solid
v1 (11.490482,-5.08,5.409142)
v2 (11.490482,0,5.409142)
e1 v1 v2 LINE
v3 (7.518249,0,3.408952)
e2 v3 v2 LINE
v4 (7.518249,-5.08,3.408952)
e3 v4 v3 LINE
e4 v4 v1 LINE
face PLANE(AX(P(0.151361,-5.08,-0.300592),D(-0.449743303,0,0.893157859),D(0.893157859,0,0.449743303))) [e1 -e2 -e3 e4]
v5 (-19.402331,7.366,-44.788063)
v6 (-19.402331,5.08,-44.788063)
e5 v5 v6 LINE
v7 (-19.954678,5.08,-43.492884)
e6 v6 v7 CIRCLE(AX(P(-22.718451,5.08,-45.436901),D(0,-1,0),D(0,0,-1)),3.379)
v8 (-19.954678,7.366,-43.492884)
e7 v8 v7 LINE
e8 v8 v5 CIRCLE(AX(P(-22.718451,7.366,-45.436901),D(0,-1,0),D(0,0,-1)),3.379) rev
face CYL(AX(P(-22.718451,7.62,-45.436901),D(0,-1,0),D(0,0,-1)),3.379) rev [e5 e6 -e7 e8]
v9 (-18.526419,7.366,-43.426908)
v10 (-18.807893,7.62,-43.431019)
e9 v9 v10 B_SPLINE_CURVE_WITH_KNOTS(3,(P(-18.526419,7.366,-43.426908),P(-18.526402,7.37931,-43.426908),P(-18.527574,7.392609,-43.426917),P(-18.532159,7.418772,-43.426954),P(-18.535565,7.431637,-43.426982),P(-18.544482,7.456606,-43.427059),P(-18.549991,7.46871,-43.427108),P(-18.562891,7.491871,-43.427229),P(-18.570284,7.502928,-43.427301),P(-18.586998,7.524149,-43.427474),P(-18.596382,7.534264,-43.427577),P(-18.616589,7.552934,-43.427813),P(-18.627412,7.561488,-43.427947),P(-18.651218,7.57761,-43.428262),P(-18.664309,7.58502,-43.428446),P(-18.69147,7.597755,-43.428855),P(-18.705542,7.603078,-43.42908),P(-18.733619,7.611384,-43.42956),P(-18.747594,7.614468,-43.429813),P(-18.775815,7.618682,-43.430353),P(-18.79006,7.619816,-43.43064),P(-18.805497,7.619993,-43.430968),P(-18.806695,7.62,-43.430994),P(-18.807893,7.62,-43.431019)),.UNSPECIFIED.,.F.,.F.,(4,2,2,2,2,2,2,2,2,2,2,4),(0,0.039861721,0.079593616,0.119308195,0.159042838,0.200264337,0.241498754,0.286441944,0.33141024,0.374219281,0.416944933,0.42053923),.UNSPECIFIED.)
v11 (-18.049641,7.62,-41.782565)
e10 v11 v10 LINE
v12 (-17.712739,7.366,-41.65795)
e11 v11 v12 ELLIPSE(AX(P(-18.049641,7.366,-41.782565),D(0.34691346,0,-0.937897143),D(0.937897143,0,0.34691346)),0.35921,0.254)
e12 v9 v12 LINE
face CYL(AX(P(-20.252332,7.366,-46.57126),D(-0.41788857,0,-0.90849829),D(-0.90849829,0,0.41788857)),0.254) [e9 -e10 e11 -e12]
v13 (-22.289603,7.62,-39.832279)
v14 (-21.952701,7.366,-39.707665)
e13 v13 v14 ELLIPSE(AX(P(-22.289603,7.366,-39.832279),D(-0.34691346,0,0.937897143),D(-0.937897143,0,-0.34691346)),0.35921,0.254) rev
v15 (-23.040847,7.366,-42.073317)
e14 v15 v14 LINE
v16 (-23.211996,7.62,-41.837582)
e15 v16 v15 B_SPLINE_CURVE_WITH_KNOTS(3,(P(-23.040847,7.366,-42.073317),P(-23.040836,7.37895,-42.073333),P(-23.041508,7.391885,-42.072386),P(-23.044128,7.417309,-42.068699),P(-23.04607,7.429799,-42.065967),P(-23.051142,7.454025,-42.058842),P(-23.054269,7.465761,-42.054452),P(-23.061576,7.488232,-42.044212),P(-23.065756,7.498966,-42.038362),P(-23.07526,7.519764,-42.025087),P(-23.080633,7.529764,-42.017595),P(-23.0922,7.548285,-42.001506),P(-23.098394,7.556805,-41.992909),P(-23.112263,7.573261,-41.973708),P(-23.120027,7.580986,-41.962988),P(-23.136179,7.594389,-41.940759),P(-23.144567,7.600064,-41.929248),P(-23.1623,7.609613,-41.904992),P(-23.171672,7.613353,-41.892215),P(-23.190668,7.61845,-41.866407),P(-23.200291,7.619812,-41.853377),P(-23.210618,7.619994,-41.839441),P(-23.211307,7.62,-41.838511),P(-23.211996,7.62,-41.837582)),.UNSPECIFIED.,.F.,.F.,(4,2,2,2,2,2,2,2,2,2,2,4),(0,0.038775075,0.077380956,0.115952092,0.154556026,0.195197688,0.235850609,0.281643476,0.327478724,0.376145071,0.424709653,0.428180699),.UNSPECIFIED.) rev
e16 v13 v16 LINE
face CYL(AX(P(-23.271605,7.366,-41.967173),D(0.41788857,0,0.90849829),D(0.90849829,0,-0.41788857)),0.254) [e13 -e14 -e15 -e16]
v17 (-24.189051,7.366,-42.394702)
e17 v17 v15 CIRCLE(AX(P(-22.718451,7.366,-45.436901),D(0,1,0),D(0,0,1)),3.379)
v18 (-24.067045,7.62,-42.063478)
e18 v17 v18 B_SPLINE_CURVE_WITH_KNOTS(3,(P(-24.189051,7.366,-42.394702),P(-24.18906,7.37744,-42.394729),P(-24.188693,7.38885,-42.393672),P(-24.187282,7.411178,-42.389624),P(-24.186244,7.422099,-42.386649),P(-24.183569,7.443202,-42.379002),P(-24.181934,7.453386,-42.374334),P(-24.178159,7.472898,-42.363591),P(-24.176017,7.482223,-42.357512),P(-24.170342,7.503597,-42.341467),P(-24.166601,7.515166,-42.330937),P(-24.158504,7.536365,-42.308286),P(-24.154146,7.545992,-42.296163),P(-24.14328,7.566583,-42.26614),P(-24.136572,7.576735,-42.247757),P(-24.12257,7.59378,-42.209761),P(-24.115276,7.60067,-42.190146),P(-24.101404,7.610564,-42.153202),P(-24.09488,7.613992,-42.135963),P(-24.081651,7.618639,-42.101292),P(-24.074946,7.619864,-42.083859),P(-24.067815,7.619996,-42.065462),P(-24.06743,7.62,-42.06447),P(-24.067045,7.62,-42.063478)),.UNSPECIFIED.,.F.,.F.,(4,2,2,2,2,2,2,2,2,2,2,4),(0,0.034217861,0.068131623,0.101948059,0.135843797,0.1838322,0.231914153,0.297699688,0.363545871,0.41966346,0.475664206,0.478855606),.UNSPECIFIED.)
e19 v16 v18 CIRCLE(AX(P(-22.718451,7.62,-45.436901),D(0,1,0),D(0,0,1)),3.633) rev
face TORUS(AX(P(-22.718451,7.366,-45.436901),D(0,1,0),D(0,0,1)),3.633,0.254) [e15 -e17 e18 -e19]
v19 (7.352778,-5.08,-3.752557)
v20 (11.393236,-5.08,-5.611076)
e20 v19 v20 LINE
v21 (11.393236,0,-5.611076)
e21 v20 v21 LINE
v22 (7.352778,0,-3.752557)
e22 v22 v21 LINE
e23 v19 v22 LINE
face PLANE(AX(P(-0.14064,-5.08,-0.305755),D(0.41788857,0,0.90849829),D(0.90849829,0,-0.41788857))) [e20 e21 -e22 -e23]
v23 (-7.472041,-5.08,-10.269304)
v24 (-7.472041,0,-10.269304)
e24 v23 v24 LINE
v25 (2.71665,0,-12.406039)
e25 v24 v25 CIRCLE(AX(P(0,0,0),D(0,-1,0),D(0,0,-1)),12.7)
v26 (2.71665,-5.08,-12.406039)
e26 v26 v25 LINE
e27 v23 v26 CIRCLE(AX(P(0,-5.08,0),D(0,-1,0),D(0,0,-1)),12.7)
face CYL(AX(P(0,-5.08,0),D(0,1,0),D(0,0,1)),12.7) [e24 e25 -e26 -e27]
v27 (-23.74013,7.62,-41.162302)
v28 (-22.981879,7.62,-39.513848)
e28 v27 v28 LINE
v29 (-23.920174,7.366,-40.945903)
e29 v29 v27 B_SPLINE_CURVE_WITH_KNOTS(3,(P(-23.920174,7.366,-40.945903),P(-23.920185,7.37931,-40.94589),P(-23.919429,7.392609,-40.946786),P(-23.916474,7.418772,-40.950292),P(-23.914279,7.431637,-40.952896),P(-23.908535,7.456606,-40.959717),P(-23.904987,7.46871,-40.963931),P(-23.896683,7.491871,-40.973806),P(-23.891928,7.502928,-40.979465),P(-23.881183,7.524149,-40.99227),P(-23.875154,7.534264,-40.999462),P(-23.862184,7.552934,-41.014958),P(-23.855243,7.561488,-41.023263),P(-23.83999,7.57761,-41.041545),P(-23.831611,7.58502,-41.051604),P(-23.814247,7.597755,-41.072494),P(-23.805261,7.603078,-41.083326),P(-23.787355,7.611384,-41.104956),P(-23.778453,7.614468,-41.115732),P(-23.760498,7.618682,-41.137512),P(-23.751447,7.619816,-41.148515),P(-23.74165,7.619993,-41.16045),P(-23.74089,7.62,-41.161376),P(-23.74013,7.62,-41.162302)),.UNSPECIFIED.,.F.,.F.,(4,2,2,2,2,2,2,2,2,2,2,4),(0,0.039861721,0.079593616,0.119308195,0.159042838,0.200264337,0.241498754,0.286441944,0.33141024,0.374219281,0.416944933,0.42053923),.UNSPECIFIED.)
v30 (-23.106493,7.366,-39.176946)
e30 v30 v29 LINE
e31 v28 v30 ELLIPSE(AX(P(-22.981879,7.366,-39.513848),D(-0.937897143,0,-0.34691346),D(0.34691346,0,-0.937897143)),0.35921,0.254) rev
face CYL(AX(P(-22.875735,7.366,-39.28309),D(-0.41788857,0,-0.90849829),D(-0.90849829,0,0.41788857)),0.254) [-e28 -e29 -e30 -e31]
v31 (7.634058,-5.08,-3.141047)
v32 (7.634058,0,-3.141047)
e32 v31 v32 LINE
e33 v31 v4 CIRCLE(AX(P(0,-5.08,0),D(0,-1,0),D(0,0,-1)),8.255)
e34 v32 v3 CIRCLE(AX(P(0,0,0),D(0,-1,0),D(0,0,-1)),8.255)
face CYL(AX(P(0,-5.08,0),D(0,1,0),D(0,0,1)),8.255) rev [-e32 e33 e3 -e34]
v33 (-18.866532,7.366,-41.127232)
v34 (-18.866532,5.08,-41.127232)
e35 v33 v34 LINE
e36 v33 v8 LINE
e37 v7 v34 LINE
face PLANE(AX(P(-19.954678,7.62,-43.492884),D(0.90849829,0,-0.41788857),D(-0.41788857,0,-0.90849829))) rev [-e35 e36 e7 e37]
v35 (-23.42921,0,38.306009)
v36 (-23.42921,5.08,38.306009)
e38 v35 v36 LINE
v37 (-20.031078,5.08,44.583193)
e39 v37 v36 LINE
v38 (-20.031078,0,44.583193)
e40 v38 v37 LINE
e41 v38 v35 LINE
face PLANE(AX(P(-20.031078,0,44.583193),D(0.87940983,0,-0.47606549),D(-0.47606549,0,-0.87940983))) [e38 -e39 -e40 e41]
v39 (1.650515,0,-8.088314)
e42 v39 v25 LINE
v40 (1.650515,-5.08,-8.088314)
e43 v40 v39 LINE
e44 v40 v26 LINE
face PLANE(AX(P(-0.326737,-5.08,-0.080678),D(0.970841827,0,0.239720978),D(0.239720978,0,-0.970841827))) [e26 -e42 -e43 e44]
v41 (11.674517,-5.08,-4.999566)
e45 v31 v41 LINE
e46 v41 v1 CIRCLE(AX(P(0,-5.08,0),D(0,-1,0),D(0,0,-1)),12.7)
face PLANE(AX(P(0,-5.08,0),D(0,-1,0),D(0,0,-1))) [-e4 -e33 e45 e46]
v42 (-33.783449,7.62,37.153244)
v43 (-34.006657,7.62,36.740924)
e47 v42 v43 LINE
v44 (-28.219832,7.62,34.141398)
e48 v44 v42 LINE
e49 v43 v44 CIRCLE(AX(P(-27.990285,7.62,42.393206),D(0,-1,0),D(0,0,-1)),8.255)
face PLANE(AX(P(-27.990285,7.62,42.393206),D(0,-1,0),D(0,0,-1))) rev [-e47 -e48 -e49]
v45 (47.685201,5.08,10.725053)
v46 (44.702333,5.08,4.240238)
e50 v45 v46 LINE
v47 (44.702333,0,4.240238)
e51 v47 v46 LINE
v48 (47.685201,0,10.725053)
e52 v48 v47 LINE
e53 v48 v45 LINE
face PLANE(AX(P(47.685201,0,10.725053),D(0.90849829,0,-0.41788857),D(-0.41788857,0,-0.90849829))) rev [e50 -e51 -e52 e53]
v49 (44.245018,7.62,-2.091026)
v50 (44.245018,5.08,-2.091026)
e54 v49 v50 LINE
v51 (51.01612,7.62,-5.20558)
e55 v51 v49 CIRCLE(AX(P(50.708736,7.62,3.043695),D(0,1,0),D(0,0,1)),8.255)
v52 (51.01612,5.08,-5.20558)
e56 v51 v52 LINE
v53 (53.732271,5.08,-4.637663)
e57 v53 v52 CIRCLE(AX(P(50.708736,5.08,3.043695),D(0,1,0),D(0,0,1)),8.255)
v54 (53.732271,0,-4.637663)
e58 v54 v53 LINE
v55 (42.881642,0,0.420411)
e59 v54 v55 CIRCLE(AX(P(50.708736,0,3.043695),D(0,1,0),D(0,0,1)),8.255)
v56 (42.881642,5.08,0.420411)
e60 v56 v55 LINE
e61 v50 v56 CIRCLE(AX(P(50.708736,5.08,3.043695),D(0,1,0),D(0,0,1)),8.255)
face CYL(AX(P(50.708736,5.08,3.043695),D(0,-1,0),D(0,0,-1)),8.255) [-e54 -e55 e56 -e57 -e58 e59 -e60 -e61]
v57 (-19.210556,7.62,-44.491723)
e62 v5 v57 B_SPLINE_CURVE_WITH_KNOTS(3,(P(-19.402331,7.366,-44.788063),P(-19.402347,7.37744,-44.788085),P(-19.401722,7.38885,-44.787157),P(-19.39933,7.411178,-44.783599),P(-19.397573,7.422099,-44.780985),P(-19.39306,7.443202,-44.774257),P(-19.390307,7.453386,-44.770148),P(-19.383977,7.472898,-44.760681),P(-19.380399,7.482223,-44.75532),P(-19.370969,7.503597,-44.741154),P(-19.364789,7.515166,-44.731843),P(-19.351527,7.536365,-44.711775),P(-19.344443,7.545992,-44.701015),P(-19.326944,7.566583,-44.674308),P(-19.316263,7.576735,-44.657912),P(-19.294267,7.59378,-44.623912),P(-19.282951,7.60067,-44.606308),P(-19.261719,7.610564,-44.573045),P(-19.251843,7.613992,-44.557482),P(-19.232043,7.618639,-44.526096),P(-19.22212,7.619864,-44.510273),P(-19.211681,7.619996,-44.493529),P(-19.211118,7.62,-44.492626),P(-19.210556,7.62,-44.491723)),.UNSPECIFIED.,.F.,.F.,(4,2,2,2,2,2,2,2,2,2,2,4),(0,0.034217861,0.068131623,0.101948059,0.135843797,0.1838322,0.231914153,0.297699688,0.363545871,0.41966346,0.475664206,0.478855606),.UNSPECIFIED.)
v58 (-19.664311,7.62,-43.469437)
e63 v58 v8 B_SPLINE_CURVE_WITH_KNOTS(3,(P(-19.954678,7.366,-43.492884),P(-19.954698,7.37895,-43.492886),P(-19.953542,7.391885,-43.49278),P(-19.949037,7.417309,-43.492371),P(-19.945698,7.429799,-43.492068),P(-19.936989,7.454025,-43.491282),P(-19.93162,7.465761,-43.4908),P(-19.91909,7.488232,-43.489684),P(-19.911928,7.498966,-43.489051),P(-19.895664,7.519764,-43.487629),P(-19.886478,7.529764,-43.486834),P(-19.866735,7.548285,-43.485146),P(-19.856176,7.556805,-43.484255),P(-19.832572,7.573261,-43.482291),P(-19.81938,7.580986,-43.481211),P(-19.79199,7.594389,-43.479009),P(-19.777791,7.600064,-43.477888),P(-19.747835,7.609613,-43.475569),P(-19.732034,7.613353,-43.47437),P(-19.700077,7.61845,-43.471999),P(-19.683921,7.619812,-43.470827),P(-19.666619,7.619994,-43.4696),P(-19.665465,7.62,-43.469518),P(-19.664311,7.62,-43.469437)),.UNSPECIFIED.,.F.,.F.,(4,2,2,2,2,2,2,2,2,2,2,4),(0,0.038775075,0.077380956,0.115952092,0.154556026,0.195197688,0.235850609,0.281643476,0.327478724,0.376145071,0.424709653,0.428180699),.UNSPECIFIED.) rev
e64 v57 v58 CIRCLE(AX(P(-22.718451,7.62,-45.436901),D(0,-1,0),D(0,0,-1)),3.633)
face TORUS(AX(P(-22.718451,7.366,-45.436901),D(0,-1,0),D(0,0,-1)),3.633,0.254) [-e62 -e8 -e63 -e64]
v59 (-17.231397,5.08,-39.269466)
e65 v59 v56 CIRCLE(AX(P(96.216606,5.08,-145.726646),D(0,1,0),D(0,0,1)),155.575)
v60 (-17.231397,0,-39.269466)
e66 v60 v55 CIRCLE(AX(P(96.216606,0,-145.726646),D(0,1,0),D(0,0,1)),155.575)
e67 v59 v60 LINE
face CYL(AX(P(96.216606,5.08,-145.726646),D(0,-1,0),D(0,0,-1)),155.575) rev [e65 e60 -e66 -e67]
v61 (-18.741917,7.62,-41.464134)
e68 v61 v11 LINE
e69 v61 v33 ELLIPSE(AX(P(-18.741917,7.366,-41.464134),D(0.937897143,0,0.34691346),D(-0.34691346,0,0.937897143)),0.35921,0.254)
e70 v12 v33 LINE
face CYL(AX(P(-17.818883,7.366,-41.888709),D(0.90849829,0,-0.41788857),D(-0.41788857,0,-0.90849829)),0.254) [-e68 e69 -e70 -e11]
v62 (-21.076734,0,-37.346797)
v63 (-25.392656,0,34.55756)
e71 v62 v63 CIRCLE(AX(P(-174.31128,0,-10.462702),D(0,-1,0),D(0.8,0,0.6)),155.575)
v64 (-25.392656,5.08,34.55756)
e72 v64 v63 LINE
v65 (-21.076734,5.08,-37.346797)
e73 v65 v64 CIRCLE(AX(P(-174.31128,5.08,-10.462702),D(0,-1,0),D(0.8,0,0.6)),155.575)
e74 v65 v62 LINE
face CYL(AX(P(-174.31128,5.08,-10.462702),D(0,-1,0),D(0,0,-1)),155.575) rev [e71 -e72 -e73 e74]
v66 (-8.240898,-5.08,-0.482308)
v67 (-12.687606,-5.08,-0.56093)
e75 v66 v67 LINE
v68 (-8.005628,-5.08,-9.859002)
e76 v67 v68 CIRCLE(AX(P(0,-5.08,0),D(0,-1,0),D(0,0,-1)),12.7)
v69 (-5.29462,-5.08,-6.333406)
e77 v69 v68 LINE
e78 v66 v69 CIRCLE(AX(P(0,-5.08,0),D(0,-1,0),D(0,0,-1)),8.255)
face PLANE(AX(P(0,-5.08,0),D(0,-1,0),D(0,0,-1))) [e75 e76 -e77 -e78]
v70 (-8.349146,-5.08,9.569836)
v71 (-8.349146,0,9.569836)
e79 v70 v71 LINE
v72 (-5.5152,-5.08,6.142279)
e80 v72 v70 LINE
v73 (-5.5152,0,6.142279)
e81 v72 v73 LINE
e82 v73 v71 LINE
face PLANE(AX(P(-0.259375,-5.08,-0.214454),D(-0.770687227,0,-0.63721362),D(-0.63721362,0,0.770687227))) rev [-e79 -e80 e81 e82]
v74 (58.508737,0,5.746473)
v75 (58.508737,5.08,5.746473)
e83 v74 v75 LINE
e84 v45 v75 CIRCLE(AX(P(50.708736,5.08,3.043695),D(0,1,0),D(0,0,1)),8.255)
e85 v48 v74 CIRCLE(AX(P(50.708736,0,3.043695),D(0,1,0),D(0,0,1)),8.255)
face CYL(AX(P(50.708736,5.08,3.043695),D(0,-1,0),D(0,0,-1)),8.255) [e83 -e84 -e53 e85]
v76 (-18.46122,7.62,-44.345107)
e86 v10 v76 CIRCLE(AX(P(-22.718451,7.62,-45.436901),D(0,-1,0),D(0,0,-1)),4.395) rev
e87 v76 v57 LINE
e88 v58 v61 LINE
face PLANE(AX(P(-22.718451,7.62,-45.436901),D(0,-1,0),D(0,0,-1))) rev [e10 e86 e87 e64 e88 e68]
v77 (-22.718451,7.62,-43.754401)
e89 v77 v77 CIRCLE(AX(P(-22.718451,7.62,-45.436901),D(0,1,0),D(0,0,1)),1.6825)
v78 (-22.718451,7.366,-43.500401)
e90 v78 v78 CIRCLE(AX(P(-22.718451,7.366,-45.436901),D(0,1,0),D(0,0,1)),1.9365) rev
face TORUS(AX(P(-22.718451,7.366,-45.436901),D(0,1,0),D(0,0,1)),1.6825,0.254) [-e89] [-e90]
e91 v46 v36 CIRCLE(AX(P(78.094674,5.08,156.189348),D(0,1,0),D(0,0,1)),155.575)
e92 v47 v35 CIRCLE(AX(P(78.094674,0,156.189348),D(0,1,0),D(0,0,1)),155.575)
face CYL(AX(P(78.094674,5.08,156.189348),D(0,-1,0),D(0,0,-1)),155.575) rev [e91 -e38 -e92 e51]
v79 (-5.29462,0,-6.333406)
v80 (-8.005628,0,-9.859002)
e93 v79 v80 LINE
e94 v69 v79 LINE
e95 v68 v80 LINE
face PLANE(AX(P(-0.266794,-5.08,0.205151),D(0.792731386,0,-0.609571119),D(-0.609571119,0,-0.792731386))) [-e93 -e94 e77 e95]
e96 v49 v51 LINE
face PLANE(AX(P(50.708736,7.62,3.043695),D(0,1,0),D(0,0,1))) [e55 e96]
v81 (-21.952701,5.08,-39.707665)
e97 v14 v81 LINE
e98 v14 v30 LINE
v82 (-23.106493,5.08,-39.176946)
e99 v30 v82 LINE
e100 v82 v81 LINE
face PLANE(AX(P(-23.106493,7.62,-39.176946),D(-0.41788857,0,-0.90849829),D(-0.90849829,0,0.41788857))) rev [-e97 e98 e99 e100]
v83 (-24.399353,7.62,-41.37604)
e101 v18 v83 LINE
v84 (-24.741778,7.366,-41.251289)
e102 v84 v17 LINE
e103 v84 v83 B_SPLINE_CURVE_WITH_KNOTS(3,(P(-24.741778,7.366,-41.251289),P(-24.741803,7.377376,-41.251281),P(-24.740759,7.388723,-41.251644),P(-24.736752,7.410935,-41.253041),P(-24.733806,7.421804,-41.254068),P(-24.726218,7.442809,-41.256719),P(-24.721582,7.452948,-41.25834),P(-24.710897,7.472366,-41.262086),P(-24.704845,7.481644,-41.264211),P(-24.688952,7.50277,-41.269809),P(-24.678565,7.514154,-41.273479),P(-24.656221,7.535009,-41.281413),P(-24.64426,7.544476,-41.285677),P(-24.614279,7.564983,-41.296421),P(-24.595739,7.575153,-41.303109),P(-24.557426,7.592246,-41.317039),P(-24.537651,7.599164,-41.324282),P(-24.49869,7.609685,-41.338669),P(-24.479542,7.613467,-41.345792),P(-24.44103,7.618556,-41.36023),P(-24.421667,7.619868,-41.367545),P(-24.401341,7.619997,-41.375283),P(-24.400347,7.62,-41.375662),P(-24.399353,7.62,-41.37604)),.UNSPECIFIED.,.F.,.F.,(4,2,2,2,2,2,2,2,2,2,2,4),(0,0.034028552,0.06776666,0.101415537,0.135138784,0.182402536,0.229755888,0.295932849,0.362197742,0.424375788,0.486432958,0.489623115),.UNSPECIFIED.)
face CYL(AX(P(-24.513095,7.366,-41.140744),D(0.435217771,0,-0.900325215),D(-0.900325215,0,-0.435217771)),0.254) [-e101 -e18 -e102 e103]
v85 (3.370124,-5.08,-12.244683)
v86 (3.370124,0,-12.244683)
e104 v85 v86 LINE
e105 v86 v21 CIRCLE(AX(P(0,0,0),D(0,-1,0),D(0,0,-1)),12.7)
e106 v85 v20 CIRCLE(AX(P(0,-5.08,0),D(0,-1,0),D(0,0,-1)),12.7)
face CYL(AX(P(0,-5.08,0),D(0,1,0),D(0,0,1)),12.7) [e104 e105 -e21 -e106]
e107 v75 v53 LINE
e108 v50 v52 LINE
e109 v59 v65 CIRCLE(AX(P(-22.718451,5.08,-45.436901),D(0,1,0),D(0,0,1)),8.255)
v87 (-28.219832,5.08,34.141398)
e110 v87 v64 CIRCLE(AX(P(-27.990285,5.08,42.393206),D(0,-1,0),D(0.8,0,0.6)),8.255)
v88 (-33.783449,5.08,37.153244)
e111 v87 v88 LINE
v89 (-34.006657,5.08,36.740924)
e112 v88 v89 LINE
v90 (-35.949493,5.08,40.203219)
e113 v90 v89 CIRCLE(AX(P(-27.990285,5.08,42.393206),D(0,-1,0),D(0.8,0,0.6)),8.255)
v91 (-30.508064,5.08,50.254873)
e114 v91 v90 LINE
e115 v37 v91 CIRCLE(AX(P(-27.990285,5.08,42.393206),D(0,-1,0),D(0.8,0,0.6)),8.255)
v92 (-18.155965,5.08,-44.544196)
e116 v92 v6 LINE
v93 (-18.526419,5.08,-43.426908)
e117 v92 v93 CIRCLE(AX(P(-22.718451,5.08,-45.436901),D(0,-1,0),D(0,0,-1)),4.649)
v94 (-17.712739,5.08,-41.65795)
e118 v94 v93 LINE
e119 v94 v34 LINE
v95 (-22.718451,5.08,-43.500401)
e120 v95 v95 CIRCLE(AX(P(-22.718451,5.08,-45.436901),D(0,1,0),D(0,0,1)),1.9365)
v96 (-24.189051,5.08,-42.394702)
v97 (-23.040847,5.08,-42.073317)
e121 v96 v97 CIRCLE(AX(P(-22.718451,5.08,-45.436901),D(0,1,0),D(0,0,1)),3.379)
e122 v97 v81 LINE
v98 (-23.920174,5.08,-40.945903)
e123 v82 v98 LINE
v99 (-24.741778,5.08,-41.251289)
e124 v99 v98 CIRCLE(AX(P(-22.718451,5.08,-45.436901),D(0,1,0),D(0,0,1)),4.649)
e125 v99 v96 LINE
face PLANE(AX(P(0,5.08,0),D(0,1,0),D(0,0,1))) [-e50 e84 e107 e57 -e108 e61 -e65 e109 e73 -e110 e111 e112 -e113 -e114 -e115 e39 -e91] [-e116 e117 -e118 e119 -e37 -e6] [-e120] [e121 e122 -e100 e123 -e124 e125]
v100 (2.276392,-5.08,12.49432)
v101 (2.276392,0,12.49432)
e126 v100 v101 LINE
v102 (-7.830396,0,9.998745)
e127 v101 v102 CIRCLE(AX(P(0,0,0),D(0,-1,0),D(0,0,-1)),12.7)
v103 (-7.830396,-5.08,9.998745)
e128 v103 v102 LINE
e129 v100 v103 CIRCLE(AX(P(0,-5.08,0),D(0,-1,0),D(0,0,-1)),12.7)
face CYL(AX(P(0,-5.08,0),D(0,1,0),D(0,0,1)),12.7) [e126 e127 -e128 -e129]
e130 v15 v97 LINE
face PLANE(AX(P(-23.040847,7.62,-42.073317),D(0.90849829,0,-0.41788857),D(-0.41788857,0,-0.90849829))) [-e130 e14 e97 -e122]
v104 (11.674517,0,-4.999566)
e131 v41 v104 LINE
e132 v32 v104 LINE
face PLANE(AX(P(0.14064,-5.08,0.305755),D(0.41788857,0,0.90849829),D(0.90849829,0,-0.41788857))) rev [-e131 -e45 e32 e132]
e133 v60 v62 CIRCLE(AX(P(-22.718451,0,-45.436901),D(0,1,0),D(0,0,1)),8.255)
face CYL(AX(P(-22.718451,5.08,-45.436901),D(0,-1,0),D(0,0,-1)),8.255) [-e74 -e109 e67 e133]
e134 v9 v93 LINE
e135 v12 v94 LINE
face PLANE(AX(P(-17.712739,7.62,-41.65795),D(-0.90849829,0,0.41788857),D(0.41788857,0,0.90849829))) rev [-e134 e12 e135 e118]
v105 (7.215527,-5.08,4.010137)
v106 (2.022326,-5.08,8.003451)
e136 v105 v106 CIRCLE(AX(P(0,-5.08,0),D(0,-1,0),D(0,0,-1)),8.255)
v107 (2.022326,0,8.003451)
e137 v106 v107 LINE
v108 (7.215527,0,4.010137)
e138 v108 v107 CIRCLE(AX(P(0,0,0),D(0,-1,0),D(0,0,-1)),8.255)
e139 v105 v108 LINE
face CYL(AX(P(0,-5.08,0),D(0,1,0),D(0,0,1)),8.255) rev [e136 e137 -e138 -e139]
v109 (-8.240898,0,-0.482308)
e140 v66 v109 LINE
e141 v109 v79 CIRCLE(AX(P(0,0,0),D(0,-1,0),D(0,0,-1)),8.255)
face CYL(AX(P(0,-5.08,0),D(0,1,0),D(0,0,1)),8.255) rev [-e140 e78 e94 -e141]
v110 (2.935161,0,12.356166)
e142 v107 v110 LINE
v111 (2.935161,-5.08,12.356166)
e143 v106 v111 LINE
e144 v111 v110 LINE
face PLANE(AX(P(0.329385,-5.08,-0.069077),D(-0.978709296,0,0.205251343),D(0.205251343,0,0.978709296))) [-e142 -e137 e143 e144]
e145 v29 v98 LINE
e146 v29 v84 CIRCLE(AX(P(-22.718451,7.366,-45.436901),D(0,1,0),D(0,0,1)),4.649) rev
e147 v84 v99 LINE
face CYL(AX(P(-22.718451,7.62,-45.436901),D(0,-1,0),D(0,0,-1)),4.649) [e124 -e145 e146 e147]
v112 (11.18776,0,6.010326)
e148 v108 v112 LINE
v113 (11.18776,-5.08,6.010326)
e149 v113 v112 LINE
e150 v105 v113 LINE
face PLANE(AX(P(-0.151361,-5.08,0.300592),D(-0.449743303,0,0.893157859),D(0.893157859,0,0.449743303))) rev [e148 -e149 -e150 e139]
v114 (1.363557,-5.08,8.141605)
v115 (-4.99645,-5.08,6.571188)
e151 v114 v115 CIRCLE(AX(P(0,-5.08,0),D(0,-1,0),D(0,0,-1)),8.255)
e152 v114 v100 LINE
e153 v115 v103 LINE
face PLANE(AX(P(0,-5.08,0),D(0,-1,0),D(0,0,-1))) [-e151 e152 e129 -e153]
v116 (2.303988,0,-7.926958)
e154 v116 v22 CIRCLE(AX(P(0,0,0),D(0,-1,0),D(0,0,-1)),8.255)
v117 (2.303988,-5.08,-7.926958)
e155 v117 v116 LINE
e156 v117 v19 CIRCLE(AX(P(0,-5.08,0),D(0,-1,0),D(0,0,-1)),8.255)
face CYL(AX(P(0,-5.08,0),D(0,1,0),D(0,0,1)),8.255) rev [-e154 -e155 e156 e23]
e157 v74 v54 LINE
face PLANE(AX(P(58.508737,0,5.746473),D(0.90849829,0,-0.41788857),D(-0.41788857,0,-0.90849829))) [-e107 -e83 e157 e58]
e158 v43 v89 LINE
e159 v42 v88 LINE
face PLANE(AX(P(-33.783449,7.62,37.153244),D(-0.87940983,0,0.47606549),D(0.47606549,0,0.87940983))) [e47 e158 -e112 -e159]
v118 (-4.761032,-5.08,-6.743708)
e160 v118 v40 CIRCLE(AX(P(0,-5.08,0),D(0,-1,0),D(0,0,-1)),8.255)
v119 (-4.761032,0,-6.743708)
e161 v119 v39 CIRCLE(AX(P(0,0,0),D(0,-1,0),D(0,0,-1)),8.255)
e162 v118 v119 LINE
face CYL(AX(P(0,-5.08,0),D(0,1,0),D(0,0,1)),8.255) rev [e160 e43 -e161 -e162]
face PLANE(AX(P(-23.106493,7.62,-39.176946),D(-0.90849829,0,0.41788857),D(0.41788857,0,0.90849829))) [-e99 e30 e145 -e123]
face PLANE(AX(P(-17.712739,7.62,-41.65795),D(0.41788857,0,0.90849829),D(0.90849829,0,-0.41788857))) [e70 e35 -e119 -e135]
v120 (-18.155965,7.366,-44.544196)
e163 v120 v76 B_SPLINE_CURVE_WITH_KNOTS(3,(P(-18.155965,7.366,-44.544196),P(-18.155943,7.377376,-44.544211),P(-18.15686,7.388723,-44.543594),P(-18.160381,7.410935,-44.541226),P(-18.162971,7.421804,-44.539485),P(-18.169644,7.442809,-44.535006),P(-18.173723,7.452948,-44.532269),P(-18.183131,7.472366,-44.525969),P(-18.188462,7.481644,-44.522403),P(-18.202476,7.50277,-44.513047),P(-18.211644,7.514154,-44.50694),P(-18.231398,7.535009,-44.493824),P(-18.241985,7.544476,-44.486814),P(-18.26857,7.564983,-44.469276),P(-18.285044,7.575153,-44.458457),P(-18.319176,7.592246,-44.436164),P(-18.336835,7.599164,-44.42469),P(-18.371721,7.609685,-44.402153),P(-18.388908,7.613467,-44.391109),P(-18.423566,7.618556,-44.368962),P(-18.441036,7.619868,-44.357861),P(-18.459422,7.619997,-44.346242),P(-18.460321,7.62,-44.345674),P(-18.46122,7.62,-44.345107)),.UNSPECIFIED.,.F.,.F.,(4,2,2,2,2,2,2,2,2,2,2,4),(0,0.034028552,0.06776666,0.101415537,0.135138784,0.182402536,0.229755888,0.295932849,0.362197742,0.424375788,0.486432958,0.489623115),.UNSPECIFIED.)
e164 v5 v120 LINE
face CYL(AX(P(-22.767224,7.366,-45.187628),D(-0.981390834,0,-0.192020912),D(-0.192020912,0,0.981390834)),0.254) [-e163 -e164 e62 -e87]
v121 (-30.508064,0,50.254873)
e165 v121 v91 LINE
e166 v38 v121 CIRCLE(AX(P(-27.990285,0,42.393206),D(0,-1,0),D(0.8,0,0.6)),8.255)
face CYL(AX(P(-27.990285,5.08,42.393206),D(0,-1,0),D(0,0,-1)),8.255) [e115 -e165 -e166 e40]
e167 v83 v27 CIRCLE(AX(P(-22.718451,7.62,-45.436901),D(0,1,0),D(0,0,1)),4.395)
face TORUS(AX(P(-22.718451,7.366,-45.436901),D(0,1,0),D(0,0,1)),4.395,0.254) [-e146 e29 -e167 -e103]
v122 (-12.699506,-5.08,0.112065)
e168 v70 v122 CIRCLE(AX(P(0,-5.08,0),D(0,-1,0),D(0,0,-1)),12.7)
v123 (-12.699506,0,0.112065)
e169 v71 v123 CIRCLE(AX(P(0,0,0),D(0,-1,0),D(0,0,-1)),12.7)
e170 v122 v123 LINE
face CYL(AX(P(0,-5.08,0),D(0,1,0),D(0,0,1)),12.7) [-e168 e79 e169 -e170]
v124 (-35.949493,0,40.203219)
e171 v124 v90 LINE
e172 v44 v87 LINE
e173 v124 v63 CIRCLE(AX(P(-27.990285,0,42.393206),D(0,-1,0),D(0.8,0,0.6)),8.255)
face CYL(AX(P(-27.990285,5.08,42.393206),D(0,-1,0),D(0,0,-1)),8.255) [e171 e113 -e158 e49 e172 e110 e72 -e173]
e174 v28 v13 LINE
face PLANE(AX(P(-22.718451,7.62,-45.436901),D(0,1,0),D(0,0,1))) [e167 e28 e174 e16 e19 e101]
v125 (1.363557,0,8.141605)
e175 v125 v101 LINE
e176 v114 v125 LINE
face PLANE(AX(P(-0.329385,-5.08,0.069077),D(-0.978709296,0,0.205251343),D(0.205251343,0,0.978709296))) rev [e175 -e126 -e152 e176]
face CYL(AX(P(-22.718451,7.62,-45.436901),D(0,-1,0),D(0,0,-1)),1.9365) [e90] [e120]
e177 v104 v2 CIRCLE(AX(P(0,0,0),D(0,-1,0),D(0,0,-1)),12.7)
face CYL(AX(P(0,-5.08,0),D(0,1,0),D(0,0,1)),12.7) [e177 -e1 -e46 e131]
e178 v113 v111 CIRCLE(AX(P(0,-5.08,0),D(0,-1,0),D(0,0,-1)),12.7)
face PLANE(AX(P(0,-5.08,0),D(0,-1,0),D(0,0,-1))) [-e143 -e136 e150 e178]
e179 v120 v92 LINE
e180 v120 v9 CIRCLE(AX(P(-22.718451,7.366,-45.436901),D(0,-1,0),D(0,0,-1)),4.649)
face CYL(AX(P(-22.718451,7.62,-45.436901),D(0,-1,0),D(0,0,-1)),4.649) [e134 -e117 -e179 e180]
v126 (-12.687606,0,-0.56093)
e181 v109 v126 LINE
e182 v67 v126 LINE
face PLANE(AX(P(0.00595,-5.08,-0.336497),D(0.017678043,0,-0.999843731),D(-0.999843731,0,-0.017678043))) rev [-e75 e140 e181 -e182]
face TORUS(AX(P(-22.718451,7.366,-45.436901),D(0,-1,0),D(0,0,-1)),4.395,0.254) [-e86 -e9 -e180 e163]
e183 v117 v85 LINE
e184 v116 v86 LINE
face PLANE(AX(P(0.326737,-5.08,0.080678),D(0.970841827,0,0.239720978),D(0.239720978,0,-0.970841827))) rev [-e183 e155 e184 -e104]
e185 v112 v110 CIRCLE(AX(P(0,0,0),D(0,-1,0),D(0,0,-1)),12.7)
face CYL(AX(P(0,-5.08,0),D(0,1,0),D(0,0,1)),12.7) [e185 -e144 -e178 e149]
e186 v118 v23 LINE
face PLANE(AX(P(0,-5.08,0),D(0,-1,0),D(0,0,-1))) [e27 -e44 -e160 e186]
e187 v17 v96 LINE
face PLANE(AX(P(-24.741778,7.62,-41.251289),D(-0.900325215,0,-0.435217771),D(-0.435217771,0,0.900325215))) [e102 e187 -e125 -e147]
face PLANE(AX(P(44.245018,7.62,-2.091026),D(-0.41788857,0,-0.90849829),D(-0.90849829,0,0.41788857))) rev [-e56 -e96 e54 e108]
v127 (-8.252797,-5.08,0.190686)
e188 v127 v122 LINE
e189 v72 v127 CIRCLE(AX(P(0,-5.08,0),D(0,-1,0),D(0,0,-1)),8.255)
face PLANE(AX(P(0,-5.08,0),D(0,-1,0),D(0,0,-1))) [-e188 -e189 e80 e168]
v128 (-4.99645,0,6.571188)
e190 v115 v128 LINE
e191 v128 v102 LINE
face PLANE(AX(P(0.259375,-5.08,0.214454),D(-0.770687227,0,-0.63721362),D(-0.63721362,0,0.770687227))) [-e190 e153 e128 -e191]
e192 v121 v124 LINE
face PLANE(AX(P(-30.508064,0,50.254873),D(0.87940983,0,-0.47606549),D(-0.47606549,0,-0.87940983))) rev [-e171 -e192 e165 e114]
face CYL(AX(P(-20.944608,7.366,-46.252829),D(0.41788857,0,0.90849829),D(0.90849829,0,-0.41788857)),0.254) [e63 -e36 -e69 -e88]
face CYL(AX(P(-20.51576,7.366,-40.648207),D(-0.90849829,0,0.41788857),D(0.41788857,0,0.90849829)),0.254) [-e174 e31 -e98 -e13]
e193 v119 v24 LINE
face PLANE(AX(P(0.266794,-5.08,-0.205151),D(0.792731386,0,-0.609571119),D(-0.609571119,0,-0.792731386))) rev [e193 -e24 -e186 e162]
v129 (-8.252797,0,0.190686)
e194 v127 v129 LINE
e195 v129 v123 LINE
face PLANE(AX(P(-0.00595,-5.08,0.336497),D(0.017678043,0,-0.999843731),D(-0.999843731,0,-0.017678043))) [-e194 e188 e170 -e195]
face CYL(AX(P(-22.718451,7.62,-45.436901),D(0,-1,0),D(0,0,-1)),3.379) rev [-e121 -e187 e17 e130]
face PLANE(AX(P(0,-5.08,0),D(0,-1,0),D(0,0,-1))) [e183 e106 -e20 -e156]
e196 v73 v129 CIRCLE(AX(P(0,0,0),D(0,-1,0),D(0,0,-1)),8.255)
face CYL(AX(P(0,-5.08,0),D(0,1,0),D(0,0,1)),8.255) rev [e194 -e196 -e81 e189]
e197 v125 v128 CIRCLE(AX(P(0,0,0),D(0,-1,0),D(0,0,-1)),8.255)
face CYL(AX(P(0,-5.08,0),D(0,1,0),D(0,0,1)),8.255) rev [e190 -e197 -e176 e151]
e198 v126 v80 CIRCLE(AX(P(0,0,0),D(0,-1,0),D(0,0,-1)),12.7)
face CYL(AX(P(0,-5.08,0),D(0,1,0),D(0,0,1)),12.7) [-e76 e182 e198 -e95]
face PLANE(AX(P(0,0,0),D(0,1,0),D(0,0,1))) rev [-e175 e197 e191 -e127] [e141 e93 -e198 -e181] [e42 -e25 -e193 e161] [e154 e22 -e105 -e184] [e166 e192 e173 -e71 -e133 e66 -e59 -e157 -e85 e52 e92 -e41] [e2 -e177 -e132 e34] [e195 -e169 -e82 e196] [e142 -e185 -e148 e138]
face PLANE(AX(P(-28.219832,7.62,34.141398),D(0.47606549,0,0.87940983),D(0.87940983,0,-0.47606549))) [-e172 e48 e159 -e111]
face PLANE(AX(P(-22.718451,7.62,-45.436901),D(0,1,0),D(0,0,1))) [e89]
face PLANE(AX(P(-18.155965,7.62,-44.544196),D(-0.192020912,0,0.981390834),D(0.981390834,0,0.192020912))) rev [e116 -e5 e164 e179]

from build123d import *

# Parameters (mm, degrees)
SKETCH2_R           = 8.255
BOSS_EXTRUDE1_DEPTH = 5.08
CUT_EXTRUDE1_DEPTH  = 80.908377803
BOSS_EXTRUDE2_DEPTH = 5.08
SKETCH8_R           = 1.9365
BOSS_EXTRUDE4_DEPTH = 2.54
FILLET1_R           = 0.254


with BuildPart() as part:
    # Sketch2 → Boss-Extrude1 (new body)
    with BuildSketch(Plane(origin=(0, 0, 0), x_dir=(1, 0, 0), z_dir=(0, 1, 0))):
        with Locations((50.708736123, -3.043695253)):
            Circle(SKETCH2_R)
        with BuildLine():
            Line((-26.410198882, 52.820397765), (8.519418994, -17.038837989))
            ThreePointArc((8.519418994, -17.038837989), (29.111674539, -8.526738277), (50.708736123, -3.043695253))
            ThreePointArc((50.708736123, -3.043695253), (13.970978455, 13.668941274), (-17.231396722, 39.269465517))
            ThreePointArc((-17.231396722, 39.269465517), (-15.883780079, 50.066404858), (-26.410198882, 52.820397765))
        make_face()
    boss_extrude1 = extrude(amount=BOSS_EXTRUDE1_DEPTH)

    # Sketch5 → Cut-Extrude1 (cut, through all)
    with BuildSketch(Plane(origin=(0, 5.08, 0), x_dir=(1, 0, 0), z_dir=(0, 1, 0))):
        with BuildLine():
            Line((58.508737367, -5.746472638), (53.73227101, 4.637662817))
            ThreePointArc((53.73227101, 4.637662817), (58.208389507, 0.405974894), (58.508737367, -5.746472638))
        make_face()
        with BuildLine():
            Line((47.685201237, -10.725053322), (44.702333378, -4.240237651))
            ThreePointArc((44.702333378, -4.240237651), (43.662385588, -4.472512868), (42.624053092, -4.711905455))
            ThreePointArc((42.624053092, -4.711905455), (44.393072013, -8.359465362), (47.685201237, -10.725053322))
        make_face()
    cut_extrude1 = extrude(amount=-CUT_EXTRUDE1_DEPTH, mode=Mode.SUBTRACT)

    # Mirror4: Boss-Extrude1, Cut-Extrude1 across plane
    add(boss_extrude1.mirror(Plane(origin=(0, 5.08, 0), x_dir=(0.4472135954999568, 0, 0.8944271909999164), z_dir=(0.8944271909999165, 0, -0.4472135954999568))))
    add(cut_extrude1.mirror(Plane(origin=(0, 5.08, 0), x_dir=(0.4472135954999568, 0, 0.8944271909999164), z_dir=(0.8944271909999165, 0, -0.4472135954999568))), mode=Mode.SUBTRACT)

    # Sketch3 → Boss-Extrude2 (add)
    with BuildSketch(Plane.XZ):
        with BuildLine():
            Line((-7.830396175, 9.998744708), (-4.996450265, 6.571187849))
            ThreePointArc((-4.996450265, 6.571187849), (-1.978896677, 8.01429928), (1.363556525, 8.141605407))
            Line((1.363556525, 8.141605407), (2.276392011, 12.494320286))
            ThreePointArc((2.276392011, 12.494320286), (-3.044456426, 12.329691199), (-7.830396175, 9.998744708))
        make_face()
        with BuildLine():
            Line((2.935161238, 12.356165607), (2.022325752, 8.003450728))
            ThreePointArc((2.022325752, 8.003450728), (2.873803437, 7.738622539), (3.691748231, 7.383496462))
            Line((3.691748231, 7.383496462), (5.679612663, 11.359225326))
            ThreePointArc((5.679612663, 11.359225326), (4.336133626, 11.936831455), (2.935161238, 12.356165607))
        make_face()
        with BuildLine():
            ThreePointArc((3.691748231, 7.383496462), (5.70850704, 5.963050593), (7.215527013, 4.010136523))
            Line((7.215527013, 4.010136523), (11.187760156, 6.010326339))
            ThreePointArc((11.187760156, 6.010326339), (8.847584221, 9.110996293), (5.679612663, 11.359225326))
            Line((5.679612663, 11.359225326), (3.691748231, 7.383496462))
        make_face()
        with BuildLine():
            ThreePointArc((8.255, 0), (8.09827691, -1.600917263), (7.63405849, -3.141046955))
            Line((7.63405849, -3.141046955), (11.674516714, -4.99956593))
            ThreePointArc((11.674516714, -4.99956593), (12.440987949, -2.551826574), (12.7, 0))
            ThreePointArc((12.7, 0), (12.39393251, 2.771360123), (11.490482373, 5.409141784))
            Line((11.490482373, 5.409141784), (7.51824923, 3.408951968))
            ThreePointArc((7.51824923, 3.408951968), (8.068710318, 1.743828777), (8.255, 0))
        make_face()
        with BuildLine():
            Line((11.393235918, -5.611076129), (7.352777693, -3.752557154))
            ThreePointArc((7.352777693, -3.752557154), (5.260198437, -6.362023059), (2.303988218, -7.92695801))
            Line((2.303988218, -7.92695801), (3.370124071, -12.244683081))
            ThreePointArc((3.370124071, -12.244683081), (8.092612979, -9.787727784), (11.393235918, -5.611076129))
        make_face()
        with BuildLine():
            Line((2.716650437, -12.406039271), (1.650514584, -8.088314201))
            ThreePointArc((1.650514584, -8.088314201), (-1.07974567, -8.18408054), (-3.691748231, -7.383496462))
            Line((-3.691748231, -7.383496462), (-5.679612663, -11.359225326))
            ThreePointArc((-5.679612663, -11.359225326), (-1.571222819, -12.602430672), (2.716650437, -12.406039271))
        make_face()
        with BuildLine():
            Line((-5.679612663, -11.359225326), (-3.691748231, -7.383496462))
            ThreePointArc((-3.691748231, -7.383496462), (-4.238479263, -7.083806783), (-4.761032175, -6.743708003))
            Line((-4.761032175, -6.743708003), (-7.472040736, -10.269304126))
            ThreePointArc((-7.472040736, -10.269304126), (-6.598369408, -10.851337298), (-5.679612663, -11.359225326))
        make_face()
        with BuildLine():
            Line((-8.005628232, -9.859001806), (-5.294619671, -6.333405683))
            ThreePointArc((-5.294619671, -6.333405683), (-7.373018127, -3.712630966), (-8.240898233, -0.482308323))
            Line((-8.240898233, -0.482308323), (-12.687606467, -0.560929709))
            ThreePointArc((-12.687606467, -0.560929709), (-11.343104811, -5.711739948), (-8.005628232, -9.859001806))
        make_face()
        with BuildLine():
            Line((-12.699505558, 0.112065107), (-8.252797323, 0.190686492))
            ThreePointArc((-8.252797323, 0.190686492), (-7.499653384, 3.449670147), (-5.515199838, 6.142279361))
            Line((-5.515199838, 6.142279361), (-8.349145748, 9.56983622))
            ThreePointArc((-8.349145748, 9.56983622), (-11.537928283, 5.307184842), (-12.699505558, 0.112065107))
        make_face()
    extrude(amount=BOSS_EXTRUDE2_DEPTH)

    # Sketch8 → Boss-Extrude4 (add)
    with BuildSketch(Plane(origin=(0, 5.08, 0), x_dir=(1, 0, 0), z_dir=(0, 1, 0))):
        with Locations(Location((-22.718450651, 45.436901303, 0), (0, 0, 270))):
            Circle(SKETCH8_R)
        with BuildLine():
            Line((44.245017522, 2.091026438), (51.016120308, 5.205579865))
            ThreePointArc((51.016120308, 5.205579865), (47.259065976, 4.455958131), (44.245017522, 2.091026438))
        make_face()
        with BuildLine():
            Line((-28.219831663, -34.141398155), (-33.783449428, -37.153243515))
            Line((-33.783449428, -37.153243515), (-34.006657305, -36.740923771))
            ThreePointArc((-34.006657305, -36.740923771), (-31.372925912, -34.863081971), (-28.219831663, -34.141398155))
        make_face()
        with BuildLine():
            Line((-23.106493475, 39.17694603), (-23.920173634, 40.945903321))
            ThreePointArc((-23.920173634, 40.945903321), (-24.338189112, 41.07918994), (-24.741778068, 41.25128938))
            Line((-24.741778068, 41.25128938), (-24.189051499, 42.394702403))
            ThreePointArc((-24.189051499, 42.394702403), (-23.62923703, 42.182963815), (-23.040846879, 42.073316657))
            Line((-23.040846879, 42.073316657), (-21.952700646, 39.707664514))
            Line((-21.952700646, 39.707664514), (-23.106493475, 39.17694603))
        make_face()
        with BuildLine():
            Line((-18.155964663, 44.544196083), (-19.402331023, 44.788062641))
            ThreePointArc((-19.402331023, 44.788062641), (-19.610293029, 44.111383595), (-19.954678188, 43.49288413))
            Line((-19.954678188, 43.49288413), (-18.866531955, 41.127231987))
            Line((-18.866531955, 41.127231987), (-17.712739127, 41.657950471))
            Line((-17.712739127, 41.657950471), (-18.526419286, 43.426907762))
            ThreePointArc((-18.526419286, 43.426907762), (-18.305687705, 43.97377992), (-18.155964663, 44.544196083))
        make_face()
    extrude(amount=BOSS_EXTRUDE4_DEPTH)

    # Fillet1
    # the kernel refuses this fillet: 0.254 mm, written as the material it takes off along each edge
    with BuildSketch(Plane(origin=(-22.718450651, 7.62, -45.436901303), x_dir=(0, 0, 1), z_dir=(-1, 0, 0))) as fillet1_piece_1:
        with BuildLine():
            CenterArc((1.9365 - FILLET1_R, -FILLET1_R), FILLET1_R, 0, 90)
            Line((1.9365 - FILLET1_R, 0), (1.9365, 0))
            Line((1.9365, 0), (1.9365, -FILLET1_R))
        make_face()
    revolve(axis=Axis((-22.718450651, 7.62, -45.436901303), (0, 1, 0)), mode=Mode.SUBTRACT)
    with BuildSketch(Plane(origin=(-22.718450651, 7.62, -45.436901303), x_dir=(0.8344364668114368, 0, 0.5511041488278291), z_dir=(-0.5511041488278291, 0, 0.8344364668114368))) as fillet1_piece_2_section:
        with BuildLine():
            CenterArc((4.649 - FILLET1_R, -FILLET1_R), FILLET1_R, 0, 90)
            Line((4.649 - FILLET1_R, 0), (4.649, 0))
            Line((4.649, 0), (4.649, -FILLET1_R))
        make_face()
    fillet1_piece_2 = revolve(axis=Axis((-22.718450651, 7.62, -45.436901303), (0, 1, 0)), revolution_arc=30.198076812, mode=Mode.PRIVATE)
    fillet1_piece_2 = split(fillet1_piece_2, bisect_by=Plane(origin=(-18.824875628, 7.561246822, -44.075757948), z_dir=(0.9084982899729419, 0, -0.4178885702148846)), keep=Keep.TOP, mode=Mode.PRIVATE)
    add(fillet1_piece_2, mode=Mode.SUBTRACT)
    with BuildSketch(Plane(origin=(-19.44342837, 7.62, -40.861872745), x_dir=(0, -1, 0), z_dir=(0.9084982899729457, 0, -0.4178885702148762)), Plane(origin=(-17.532781484, 7.62, -44.422262804), x_dir=(0, -1, 0), z_dir=(-0.9813908341478762, 0, -0.19202091201360277))) as fillet1_piece_3:
        with BuildLine():
            CenterArc((FILLET1_R, FILLET1_R), FILLET1_R, 180, 90)
            Line((0, FILLET1_R), (0, 0))
            Line((0, 0), (FILLET1_R, 0))
        make_face()
    extrude(amount=2.54, mode=Mode.SUBTRACT)
    with BuildSketch(Plane(origin=(-22.718450651, 7.62, -45.436901303), x_dir=(0.9999860071665359, 0, 0.005290129594736052), z_dir=(0.005290129594736052, 0, -0.9999860071665359))) as fillet1_piece_4:
        with BuildLine():
            CenterArc((3.379 + FILLET1_R, FILLET1_R), FILLET1_R, 180, 90)
            Line((3.379 + FILLET1_R, 0), (3.379, 0))
            Line((3.379, 0), (3.379, FILLET1_R))
        make_face()
    revolve(axis=Axis((-22.718450651, 7.62, -45.436901303), (0, -1, 0)), revolution_arc=45.586809734, mode=Mode.SUBTRACT)
    with BuildSketch(Plane(origin=(-20.22003743, 7.62, -44.069780544), x_dir=(0, -1, 0), z_dir=(0.41788857021487913, 0, 0.9084982899729444))) as fillet1_piece_5:
        with BuildLine():
            CenterArc((FILLET1_R, FILLET1_R), FILLET1_R, 180, 90)
            Line((0, FILLET1_R), (0, 0))
            Line((0, 0), (FILLET1_R, 0))
        make_face()
    extrude(amount=3.873914799, mode=Mode.SUBTRACT)
    with BuildSketch(Plane(origin=(-17.447379885, 7.62, -41.081054057), x_dir=(0, -1, 0), z_dir=(-0.41788857021488457, 0, -0.9084982899729418))) as fillet1_piece_6_section:
        with BuildLine():
            CenterArc((FILLET1_R, FILLET1_R), FILLET1_R, 180, 90)
            Line((0, FILLET1_R), (0, 0))
            Line((0, 0), (FILLET1_R, 0))
        make_face()
    fillet1_piece_6 = extrude(amount=3.217122312, mode=Mode.PRIVATE)
    fillet1_piece_6 = fillet1_piece_6 - Plane(origin=(-22.718450651, 7.561939846, -45.436901303), x_dir=(0.9017060368272567, 0, 0.43234965380960144), z_dir=(0, -1, 0)) * Cylinder(4.649, 8, mode=Mode.PRIVATE)
    add(fillet1_piece_6, mode=Mode.SUBTRACT)
    with BuildSketch(Plane(origin=(-25.018141353, 7.62, -40.679582869), x_dir=(0, -1, 0), z_dir=(0.43521777087784447, 0, -0.9003252145264622)), Plane(origin=(-21.375804232, 7.62, -39.973023756), x_dir=(0, -1, 0), z_dir=(-0.9084982899729452, 0, 0.41788857021487724))) as fillet1_piece_7:
        with BuildLine():
            CenterArc((FILLET1_R, -FILLET1_R), FILLET1_R, 90, 90)
            Line((0, -FILLET1_R), (0, 0))
            Line((0, 0), (FILLET1_R, 0))
        make_face()
    extrude(amount=2.54, mode=Mode.SUBTRACT)
    with BuildSketch(Plane(origin=(-22.841134233, 7.62, -38.600049616), x_dir=(0, -1, 0), z_dir=(-0.41788857021487996, 0, -0.908498289972944))) as fillet1_piece_8_section:
        with BuildLine():
            CenterArc((FILLET1_R, -FILLET1_R), FILLET1_R, 90, 90)
            Line((0, -FILLET1_R), (0, 0))
            Line((0, 0), (FILLET1_R, 0))
        make_face()
    fillet1_piece_8 = extrude(amount=3.217122312, mode=Mode.PRIVATE)
    fillet1_piece_8 = fillet1_piece_8 - Plane(origin=(-22.718450651, 7.561939847, -45.436901303), x_dir=(-0.2584906393546377, 0, 0.9660137625137806), z_dir=(0, -1, 0)) * Cylinder(4.649, 8, mode=Mode.PRIVATE)
    add(fillet1_piece_8, mode=Mode.SUBTRACT)
    with BuildSketch(Plane(origin=(-23.306206121, 7.62, -42.650213071), x_dir=(0, -1, 0), z_dir=(0.4178885702148779, 0, 0.9084982899729449))) as fillet1_piece_9:
        with BuildLine():
            CenterArc((FILLET1_R, -FILLET1_R), FILLET1_R, 90, 90)
            Line((0, -FILLET1_R), (0, 0))
            Line((0, 0), (FILLET1_R, 0))
        make_face()
    extrude(amount=3.873914799, mode=Mode.SUBTRACT)
    with BuildSketch(Plane(origin=(-22.718450651, 7.62, -45.436901303), x_dir=(-0.5957582628036739, 0, 0.8031638016626176), z_dir=(-0.8031638016626176, 0, -0.5957582628036739))) as fillet1_piece_10:
        with BuildLine():
            CenterArc((3.379 + FILLET1_R, -FILLET1_R), FILLET1_R, 90, 90)
            Line((3.379 + FILLET1_R, 0), (3.379, 0))
            Line((3.379, 0), (3.379, -FILLET1_R))
        make_face()
    revolve(axis=Axis((-22.718450651, 7.62, -45.436901303), (0, 1, 0)), revolution_arc=41.859242164, mode=Mode.SUBTRACT)
    with BuildSketch(Plane(origin=(-22.718450651, 7.62, -45.436901303), x_dir=(-0.12454585215970877, 0, 0.9922138533148043), z_dir=(0.9922138533148043, 0, 0.12454585215970877))) as fillet1_piece_11_section:
        with BuildLine():
            CenterArc((4.649 - FILLET1_R, FILLET1_R), FILLET1_R, 270, 90)
            Line((4.649 - FILLET1_R, 0), (4.649, 0))
            Line((4.649, 0), (4.649, FILLET1_R))
        make_face()
    fillet1_piece_11 = revolve(axis=Axis((-22.718450651, 7.62, -45.436901303), (0, -1, 0)), revolution_arc=26.47061248, mode=Mode.PRIVATE)
    fillet1_piece_11 = split(fillet1_piece_11, bisect_by=Plane(origin=(-24.16845647, 7.561068538, -41.485675279), z_dir=(-0.908498289972944, 0, 0.41788857021487996)), keep=Keep.TOP, mode=Mode.PRIVATE)
    add(fillet1_piece_11, mode=Mode.SUBTRACT)
    with BuildSketch(Plane(origin=(-17.447379885, 7.62, -41.081054057), x_dir=(0, -1, 0), z_dir=(-0.41788857021488457, 0, -0.9084982899729418))) as fillet1_piece_12a_section:
        with BuildLine():
            CenterArc((FILLET1_R, FILLET1_R), FILLET1_R, 180, 90)
            Line((0, FILLET1_R), (0, 0))
            Line((0, 0), (FILLET1_R, 0))
        make_face()
    fillet1_piece_12a = extrude(amount=3.217122312, mode=Mode.PRIVATE)
    fillet1_piece_12a = fillet1_piece_12a & Plane(origin=(-22.718450651, 7.564564402, -45.436901303), x_dir=(0.9017060368272567, 0, 0.43234965380960144), z_dir=(0, -1, 0)) * Cylinder(4.649, 8, mode=Mode.PRIVATE)
    with BuildSketch(Plane(origin=(-22.718450651, 7.62, -45.436901303), x_dir=(0.8344364668114368, 0, 0.5511041488278291), z_dir=(-0.5511041488278291, 0, 0.8344364668114368))) as fillet1_piece_12b_section:
        with BuildLine():
            CenterArc((4.649 - FILLET1_R, -FILLET1_R), FILLET1_R, 0, 90)
            Line((4.649 - FILLET1_R, 0), (4.649, 0))
            Line((4.649, 0), (4.649, -FILLET1_R))
        make_face()
    fillet1_piece_12b = revolve(axis=Axis((-22.718450651, 7.62, -45.436901303), (0, 1, 0)), revolution_arc=30.198076812, mode=Mode.PRIVATE)
    fillet1_piece_12b = split(fillet1_piece_12b, bisect_by=Plane(origin=(-18.473467876, 7.564339835, -43.311790315), z_dir=(-0.9084982899729419, 0, 0.4178885702148846)), keep=Keep.TOP, mode=Mode.PRIVATE)
    fillet1_piece_12 = fillet1_piece_12a & fillet1_piece_12b
    add(fillet1_piece_12, mode=Mode.SUBTRACT)
    with BuildSketch(Plane(origin=(-22.718450651, 7.62, -45.436901303), x_dir=(-0.12454585215970877, 0, 0.9922138533148043), z_dir=(0.9922138533148043, 0, 0.12454585215970877))) as fillet1_piece_13a_section:
        with BuildLine():
            CenterArc((4.649 - FILLET1_R, FILLET1_R), FILLET1_R, 270, 90)
            Line((4.649 - FILLET1_R, 0), (4.649, 0))
            Line((4.649, 0), (4.649, FILLET1_R))
        make_face()
    fillet1_piece_13a = revolve(axis=Axis((-22.718450651, 7.62, -45.436901303), (0, -1, 0)), revolution_arc=26.47061248, mode=Mode.PRIVATE)
    fillet1_piece_13a = split(fillet1_piece_13a, bisect_by=Plane(origin=(-23.86722258, 7.564339845, -40.830786649), z_dir=(0.908498289972944, 0, -0.41788857021487996)), keep=Keep.TOP, mode=Mode.PRIVATE)
    with BuildSketch(Plane(origin=(-22.841134233, 7.62, -38.600049616), x_dir=(0, -1, 0), z_dir=(-0.41788857021487996, 0, -0.908498289972944))) as fillet1_piece_13b_section:
        with BuildLine():
            CenterArc((FILLET1_R, -FILLET1_R), FILLET1_R, 90, 90)
            Line((0, -FILLET1_R), (0, 0))
            Line((0, 0), (FILLET1_R, 0))
        make_face()
    fillet1_piece_13b = extrude(amount=3.217122312, mode=Mode.PRIVATE)
    fillet1_piece_13b = fillet1_piece_13b & Plane(origin=(-22.718450651, 7.564564403, -45.436901303), x_dir=(-0.2584906393546377, 0, 0.9660137625137806), z_dir=(0, -1, 0)) * Cylinder(4.649, 8, mode=Mode.PRIVATE)
    fillet1_piece_13 = fillet1_piece_13a & fillet1_piece_13b
    add(fillet1_piece_13, mode=Mode.SUBTRACT)


solid = part.part
